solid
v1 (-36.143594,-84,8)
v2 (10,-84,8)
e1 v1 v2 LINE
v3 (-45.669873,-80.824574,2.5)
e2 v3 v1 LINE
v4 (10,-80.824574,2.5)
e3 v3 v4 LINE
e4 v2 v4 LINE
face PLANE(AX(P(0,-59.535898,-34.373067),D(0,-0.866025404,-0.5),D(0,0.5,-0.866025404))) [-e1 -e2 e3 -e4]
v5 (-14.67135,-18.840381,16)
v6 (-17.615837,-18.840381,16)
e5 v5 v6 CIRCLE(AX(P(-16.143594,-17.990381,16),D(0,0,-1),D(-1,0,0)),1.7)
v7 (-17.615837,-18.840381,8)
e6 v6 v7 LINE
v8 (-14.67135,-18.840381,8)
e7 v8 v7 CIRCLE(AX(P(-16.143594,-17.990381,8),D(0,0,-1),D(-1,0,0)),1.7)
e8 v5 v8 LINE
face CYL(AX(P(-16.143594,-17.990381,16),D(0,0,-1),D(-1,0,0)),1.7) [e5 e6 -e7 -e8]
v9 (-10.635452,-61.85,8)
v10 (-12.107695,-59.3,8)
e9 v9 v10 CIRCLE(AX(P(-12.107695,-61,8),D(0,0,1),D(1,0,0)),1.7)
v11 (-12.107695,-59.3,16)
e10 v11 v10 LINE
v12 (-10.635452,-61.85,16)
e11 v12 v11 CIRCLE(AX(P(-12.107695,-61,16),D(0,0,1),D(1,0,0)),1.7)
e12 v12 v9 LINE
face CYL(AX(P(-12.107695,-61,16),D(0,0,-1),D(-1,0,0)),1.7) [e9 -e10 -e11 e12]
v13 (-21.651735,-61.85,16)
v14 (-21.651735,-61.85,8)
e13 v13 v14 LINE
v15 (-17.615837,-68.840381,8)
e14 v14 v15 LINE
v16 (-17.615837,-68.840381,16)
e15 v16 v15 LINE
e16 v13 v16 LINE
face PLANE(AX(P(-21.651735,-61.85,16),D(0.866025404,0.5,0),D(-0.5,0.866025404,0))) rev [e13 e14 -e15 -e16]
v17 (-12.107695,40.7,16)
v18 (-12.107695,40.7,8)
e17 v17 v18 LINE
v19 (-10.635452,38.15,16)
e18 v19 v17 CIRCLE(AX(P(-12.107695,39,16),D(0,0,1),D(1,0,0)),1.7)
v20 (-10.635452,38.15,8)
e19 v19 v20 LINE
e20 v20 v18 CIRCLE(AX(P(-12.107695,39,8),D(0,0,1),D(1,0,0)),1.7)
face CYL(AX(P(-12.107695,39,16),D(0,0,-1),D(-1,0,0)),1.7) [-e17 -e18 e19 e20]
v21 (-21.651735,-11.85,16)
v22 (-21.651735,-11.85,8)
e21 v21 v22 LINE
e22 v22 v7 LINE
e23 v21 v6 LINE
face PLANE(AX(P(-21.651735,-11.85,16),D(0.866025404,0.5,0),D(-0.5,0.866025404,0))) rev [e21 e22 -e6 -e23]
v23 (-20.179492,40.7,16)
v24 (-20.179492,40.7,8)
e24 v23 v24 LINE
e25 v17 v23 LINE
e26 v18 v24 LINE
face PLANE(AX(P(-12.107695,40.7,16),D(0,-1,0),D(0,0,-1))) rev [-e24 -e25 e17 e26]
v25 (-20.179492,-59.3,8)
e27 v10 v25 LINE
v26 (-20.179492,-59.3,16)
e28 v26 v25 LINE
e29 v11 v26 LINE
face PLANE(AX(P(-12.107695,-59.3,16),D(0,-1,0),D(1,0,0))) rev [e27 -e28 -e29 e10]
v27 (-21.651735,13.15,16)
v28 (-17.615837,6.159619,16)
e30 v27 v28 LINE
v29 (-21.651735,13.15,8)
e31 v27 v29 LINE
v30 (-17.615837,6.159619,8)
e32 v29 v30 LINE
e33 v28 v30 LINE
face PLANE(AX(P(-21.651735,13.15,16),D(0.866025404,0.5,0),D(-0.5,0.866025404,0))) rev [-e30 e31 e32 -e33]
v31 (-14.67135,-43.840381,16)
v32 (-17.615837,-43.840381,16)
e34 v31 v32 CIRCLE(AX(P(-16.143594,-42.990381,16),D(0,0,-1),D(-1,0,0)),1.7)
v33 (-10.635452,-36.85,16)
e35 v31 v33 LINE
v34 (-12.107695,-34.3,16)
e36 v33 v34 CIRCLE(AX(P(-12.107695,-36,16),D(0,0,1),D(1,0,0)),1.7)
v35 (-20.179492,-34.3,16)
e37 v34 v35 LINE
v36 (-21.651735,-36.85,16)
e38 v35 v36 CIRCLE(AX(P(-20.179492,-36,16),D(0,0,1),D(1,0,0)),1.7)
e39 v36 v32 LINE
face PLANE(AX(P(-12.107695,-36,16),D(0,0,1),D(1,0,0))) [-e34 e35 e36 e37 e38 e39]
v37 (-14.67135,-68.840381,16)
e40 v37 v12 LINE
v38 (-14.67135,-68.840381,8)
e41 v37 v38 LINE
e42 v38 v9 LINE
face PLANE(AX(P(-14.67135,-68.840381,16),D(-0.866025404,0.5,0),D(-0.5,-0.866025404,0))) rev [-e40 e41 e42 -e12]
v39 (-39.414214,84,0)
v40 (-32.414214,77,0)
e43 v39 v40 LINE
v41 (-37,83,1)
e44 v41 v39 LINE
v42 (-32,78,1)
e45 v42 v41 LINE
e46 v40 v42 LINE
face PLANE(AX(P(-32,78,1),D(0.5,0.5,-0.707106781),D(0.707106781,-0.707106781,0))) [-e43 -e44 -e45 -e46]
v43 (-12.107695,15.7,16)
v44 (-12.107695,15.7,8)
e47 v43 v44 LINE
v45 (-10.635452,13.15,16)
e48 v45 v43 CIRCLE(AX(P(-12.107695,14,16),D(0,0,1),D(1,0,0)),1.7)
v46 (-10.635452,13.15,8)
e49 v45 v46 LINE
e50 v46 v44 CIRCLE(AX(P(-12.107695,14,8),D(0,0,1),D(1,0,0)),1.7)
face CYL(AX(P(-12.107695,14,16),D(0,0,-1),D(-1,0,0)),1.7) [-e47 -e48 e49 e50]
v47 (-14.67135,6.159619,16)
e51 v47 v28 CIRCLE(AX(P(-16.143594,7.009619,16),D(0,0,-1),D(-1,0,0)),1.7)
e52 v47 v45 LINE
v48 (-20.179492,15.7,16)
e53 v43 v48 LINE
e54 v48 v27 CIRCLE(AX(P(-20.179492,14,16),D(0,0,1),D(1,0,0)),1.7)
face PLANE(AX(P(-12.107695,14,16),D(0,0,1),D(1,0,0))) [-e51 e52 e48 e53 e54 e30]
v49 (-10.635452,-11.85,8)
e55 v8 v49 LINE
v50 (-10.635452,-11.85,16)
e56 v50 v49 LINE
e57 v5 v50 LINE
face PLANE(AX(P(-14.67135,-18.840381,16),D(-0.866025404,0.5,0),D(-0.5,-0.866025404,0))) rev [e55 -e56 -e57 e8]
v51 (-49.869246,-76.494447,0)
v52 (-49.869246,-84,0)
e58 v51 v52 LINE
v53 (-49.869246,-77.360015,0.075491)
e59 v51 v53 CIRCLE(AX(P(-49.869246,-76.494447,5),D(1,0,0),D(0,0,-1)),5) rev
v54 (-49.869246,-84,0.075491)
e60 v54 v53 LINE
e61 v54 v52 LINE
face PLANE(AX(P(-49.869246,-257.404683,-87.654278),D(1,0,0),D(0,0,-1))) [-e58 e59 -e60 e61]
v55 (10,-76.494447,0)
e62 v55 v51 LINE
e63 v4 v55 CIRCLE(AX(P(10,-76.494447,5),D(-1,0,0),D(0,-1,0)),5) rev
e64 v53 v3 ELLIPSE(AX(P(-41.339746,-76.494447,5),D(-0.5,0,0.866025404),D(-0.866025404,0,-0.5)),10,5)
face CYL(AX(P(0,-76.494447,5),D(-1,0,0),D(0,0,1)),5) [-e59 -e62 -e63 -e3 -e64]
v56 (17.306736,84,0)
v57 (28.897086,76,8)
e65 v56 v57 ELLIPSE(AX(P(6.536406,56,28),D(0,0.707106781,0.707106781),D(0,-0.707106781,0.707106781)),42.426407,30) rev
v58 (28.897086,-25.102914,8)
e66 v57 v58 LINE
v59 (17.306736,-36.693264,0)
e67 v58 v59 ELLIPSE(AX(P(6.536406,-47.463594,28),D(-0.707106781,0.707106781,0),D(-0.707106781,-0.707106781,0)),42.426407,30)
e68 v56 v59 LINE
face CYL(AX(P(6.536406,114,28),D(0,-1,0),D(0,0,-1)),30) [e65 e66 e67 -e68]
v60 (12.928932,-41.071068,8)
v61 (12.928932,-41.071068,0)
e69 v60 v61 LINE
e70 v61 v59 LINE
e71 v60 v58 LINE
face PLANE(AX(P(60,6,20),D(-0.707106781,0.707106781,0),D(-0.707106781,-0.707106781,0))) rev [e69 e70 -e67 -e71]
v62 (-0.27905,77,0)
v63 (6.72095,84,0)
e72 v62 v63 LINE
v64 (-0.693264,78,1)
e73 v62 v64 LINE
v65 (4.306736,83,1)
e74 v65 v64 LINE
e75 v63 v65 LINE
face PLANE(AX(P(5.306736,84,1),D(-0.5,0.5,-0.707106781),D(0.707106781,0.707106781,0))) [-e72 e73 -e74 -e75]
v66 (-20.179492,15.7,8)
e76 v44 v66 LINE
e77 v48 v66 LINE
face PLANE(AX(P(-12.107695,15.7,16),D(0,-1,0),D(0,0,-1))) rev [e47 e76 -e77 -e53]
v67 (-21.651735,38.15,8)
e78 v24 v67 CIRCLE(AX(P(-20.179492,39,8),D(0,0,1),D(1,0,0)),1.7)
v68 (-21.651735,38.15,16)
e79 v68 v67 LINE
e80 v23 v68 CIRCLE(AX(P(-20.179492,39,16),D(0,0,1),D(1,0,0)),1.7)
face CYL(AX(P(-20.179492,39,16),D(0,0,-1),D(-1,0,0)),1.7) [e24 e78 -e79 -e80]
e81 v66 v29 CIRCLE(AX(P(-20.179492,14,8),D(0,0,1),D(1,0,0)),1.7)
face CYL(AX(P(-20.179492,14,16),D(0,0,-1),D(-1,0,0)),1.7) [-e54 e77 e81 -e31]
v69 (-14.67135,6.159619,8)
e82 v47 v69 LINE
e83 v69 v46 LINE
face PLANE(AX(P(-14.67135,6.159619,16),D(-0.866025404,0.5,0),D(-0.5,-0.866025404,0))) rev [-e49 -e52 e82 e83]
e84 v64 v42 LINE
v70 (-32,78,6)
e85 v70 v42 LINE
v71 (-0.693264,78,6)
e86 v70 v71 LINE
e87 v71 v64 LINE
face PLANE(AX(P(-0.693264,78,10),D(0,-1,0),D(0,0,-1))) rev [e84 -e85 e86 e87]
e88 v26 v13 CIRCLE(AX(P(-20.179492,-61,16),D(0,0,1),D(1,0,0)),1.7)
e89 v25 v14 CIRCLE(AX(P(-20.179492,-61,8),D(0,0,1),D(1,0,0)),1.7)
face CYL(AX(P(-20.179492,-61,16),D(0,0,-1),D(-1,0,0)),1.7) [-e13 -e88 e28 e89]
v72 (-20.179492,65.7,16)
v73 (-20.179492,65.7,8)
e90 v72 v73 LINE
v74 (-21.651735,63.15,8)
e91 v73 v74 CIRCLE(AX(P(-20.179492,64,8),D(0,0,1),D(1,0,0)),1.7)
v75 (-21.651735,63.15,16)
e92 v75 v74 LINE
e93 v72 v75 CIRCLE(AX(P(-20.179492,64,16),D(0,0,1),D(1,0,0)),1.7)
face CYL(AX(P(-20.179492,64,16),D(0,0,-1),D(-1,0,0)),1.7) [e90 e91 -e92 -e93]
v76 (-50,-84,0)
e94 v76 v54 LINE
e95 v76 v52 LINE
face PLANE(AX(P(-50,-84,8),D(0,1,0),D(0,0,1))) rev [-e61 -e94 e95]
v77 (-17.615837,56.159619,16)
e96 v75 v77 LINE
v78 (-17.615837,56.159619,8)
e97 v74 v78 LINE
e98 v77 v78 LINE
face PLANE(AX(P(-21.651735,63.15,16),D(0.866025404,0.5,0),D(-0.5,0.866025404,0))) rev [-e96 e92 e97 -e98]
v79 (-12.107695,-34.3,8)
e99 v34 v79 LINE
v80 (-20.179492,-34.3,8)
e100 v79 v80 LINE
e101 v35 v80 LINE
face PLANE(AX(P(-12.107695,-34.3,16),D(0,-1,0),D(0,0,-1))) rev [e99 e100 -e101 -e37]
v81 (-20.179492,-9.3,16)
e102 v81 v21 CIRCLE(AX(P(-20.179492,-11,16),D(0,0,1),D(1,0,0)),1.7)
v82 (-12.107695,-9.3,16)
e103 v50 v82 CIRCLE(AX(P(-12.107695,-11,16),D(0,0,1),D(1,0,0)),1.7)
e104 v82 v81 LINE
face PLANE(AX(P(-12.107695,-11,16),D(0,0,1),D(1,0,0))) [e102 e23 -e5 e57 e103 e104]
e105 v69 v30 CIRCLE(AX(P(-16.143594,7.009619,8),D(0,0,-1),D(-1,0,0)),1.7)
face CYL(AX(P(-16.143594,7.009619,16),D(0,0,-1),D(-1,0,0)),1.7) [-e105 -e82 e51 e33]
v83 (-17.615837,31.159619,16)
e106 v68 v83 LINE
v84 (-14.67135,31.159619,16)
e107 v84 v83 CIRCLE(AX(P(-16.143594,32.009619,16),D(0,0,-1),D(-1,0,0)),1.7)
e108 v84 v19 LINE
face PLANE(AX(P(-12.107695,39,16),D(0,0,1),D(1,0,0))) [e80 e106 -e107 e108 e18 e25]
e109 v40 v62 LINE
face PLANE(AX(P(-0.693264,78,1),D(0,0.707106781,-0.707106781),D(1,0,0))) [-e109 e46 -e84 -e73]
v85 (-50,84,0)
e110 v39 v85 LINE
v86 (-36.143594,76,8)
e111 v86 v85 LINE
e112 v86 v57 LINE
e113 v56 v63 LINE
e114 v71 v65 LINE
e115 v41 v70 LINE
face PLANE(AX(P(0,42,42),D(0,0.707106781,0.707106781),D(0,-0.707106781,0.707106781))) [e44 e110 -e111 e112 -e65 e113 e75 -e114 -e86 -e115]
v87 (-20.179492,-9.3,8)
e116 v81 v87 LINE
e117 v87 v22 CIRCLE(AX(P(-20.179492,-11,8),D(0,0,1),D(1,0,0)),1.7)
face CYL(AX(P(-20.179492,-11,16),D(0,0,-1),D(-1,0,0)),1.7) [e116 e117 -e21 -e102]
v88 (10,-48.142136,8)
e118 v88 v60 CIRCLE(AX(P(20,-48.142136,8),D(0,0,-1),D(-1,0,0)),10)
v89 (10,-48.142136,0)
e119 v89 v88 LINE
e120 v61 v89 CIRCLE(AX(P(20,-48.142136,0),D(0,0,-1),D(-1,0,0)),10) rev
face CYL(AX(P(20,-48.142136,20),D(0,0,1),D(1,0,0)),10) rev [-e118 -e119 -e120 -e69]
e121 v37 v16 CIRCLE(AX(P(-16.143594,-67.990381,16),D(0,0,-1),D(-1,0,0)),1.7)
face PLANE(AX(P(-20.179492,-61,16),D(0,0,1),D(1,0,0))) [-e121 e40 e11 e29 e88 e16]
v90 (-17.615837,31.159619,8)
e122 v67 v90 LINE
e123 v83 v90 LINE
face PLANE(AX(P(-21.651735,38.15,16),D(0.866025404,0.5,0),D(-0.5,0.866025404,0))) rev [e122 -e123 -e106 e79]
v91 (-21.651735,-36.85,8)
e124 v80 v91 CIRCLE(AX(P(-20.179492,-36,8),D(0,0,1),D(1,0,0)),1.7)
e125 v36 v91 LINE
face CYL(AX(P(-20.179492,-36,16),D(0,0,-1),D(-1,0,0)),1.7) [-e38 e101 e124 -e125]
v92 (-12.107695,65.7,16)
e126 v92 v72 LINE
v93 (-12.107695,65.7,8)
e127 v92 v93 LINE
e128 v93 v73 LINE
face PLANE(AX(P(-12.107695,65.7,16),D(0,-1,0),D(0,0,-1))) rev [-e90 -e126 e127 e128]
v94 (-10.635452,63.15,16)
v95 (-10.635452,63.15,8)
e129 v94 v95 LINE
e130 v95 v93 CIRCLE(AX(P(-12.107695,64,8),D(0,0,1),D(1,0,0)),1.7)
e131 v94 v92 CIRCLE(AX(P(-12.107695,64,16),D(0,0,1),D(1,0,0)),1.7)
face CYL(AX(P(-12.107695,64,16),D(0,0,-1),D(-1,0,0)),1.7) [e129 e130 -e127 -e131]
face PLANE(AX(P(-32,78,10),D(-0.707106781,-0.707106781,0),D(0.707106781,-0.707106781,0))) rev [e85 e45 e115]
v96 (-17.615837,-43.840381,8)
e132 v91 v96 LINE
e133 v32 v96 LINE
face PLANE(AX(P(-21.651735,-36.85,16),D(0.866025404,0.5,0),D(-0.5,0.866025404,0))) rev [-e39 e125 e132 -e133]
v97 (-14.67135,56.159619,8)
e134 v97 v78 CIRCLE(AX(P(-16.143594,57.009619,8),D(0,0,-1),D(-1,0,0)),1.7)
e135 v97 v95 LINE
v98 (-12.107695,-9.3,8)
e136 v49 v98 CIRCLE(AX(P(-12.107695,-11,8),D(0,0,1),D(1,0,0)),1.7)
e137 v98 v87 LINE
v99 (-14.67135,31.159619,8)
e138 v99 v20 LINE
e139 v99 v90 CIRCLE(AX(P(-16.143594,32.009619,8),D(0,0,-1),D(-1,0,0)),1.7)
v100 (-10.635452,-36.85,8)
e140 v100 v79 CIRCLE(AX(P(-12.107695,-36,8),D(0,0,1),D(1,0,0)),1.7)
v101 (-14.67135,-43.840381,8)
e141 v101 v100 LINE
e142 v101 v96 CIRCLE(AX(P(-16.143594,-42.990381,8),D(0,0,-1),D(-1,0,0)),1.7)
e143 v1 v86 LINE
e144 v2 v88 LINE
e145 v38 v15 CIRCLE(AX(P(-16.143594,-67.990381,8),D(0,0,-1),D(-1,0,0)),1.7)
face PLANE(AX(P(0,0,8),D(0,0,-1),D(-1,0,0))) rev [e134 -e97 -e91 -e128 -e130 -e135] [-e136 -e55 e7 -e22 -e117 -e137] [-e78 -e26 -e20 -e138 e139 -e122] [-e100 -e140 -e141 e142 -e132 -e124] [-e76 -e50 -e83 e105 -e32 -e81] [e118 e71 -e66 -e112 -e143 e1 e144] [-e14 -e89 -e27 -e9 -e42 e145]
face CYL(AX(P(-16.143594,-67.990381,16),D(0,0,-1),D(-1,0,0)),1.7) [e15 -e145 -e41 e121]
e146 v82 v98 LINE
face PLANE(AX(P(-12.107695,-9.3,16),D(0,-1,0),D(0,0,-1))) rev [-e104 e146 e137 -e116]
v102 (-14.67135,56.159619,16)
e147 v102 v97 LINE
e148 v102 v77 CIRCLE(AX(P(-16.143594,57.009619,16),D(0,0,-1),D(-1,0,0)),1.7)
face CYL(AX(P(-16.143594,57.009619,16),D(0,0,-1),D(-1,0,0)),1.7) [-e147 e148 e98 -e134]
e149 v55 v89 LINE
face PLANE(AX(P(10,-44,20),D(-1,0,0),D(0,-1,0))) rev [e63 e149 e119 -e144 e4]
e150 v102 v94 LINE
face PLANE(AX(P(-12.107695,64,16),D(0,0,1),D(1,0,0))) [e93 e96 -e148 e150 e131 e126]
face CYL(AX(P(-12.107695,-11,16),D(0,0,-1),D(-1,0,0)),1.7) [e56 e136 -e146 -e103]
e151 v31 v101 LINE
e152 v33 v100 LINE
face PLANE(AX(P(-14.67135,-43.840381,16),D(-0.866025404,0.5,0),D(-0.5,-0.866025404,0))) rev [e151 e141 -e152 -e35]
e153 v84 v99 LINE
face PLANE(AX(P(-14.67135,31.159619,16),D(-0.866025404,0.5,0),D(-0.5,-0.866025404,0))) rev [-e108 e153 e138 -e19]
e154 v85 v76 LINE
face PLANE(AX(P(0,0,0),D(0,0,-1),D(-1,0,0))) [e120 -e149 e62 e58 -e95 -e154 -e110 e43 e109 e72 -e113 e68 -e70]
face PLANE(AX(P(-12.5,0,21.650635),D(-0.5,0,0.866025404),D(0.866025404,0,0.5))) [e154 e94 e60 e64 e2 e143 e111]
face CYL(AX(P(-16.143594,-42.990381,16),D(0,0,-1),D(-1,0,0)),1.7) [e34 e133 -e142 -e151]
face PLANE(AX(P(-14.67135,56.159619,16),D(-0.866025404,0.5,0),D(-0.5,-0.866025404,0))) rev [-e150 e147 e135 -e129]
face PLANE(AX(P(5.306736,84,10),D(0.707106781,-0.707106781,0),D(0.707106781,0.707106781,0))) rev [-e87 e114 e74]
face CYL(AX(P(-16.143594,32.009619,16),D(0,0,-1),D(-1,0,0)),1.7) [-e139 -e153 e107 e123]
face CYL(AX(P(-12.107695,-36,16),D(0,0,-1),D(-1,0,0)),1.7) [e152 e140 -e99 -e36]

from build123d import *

# Parameters (mm, degrees)
SKETCH_1_W          = 100
SKETCH_1_H          = 168
EXTRUDE_1_DEPTH     = 8
SKETCH_4_W          = 219.714234424
SKETCH_4_H          = 60.92406831
CUT_EXTRUDE_2_DEPTH = 8
SKETCH_5_W          = 131.187185814
SKETCH_5_H          = 64.749040209
CUT_EXTRUDE_3_DEPTH = 28
CUT_EXTRUDE_4_DEPTH = 198
SKETCH_7_W          = 88.901088493
SKETCH_7_H          = 24.075683618
CUT_EXTRUDE_5_DEPTH = 198
FILLET_2_R          = 5
CUT_EXTRUDE_6_DEPTH = 20
FILLET_3_R          = 10
EXTRUDE_2_DEPTH     = 8
CUT_EXTRUDE_7_DEPTH = 10
CHAMFER_1_SIZE      = 1


with BuildPart() as part:
    # 草图1 → 凸台-拉伸1 (new body)
    with BuildSketch(Plane.XY):
        Rectangle(SKETCH_1_W, SKETCH_1_H)
    extrude(amount=EXTRUDE_1_DEPTH)

    # 草图4 → 切除-拉伸2 (cut)
    with BuildSketch(Plane(origin=(-12.5, 0, 21.650635095), x_dir=(0, -1, 0), z_dir=(-0.499999999999998, 0, 0.8660254037844398))):
        with Locations((1.453456898, -25.633998951)):
            Rectangle(SKETCH_4_W, SKETCH_4_H)
    extrude(amount=CUT_EXTRUDE_2_DEPTH, mode=Mode.SUBTRACT)

    # 草图5 → 切除-拉伸3 (cut)
    with BuildSketch(Plane(origin=(0, 42, 42), x_dir=(-1, 0, 0), z_dir=(0, 0.7071067811865464, 0.7071067811865488))):
        with Locations((-5.06731619, -49.688146971)):
            Rectangle(SKETCH_5_W, SKETCH_5_H)
    extrude(amount=CUT_EXTRUDE_3_DEPTH, mode=Mode.SUBTRACT)

    # 草图6 → 切除-拉伸4 (cut)
    with BuildSketch(Plane.XZ.offset(84)):
        with BuildLine():
            Line((17.306736075, 0), (50, 0))
            Line((50, 0), (50, 8))
            Line((50, 8), (28.897086236, 8))
            ThreePointArc((28.897086236, 8), (23.578001039, 3.310243942), (17.306736075, 0))
        make_face()
    extrude(amount=-CUT_EXTRUDE_4_DEPTH, mode=Mode.SUBTRACT)

    # 草图7 → 切除-拉伸5 (cut)
    with BuildSketch(Plane(origin=(0, -59.535898385, -34.373066959), x_dir=(1, 0, 0), z_dir=(0, -0.866025403784438, -0.500000000000001))):
        with Locations((-5.418701979, 40.753668269)):
            Rectangle(SKETCH_7_W, SKETCH_7_H)
    extrude(amount=CUT_EXTRUDE_5_DEPTH, mode=Mode.SUBTRACT)

    # 圆角2
    # the kernel refuses this fillet: 5 mm, written as the material it takes off along each edge
    with BuildSketch(Plane(origin=(24.52361444, -79.381197846, 0), x_dir=(0, 1, 0), z_dir=(-1, 0, 0))) as fillet_2_piece_1:
        with BuildLine():
            CenterArc((FILLET_2_R * 0.57735026919, -FILLET_2_R), FILLET_2_R, 90, 60)
            Line((-FILLET_2_R * 0.288675134595, -FILLET_2_R * 0.5), (0, 0))
            Line((0, 0), (FILLET_2_R * 0.57735026919, 0))
        make_face()
    extrude(amount=74.392860666, mode=Mode.SUBTRACT)

    # 草图8 → 切除-拉伸6 (cut)
    with BuildSketch(Plane(origin=(0, 0, 0), x_dir=(-1, 0, 0), z_dir=(0, 0, -1))):
        Polygon((-60, 6), (-10, -44), (-10, -84), (0, -94), (-20, -94), (-60, -94), align=None)
    extrude(amount=-CUT_EXTRUDE_6_DEPTH, mode=Mode.SUBTRACT)

    # 圆角3
    fillet_3_edges = [part.edges().sort_by_distance(p)[0] for p in [
        (10, -44, 4),
    ]]
    fillet(fillet_3_edges, radius=FILLET_3_R)

    # 草图9 → 凸台-拉伸2 (add)
    with BuildSketch(Plane.XY.offset(8)):
        with BuildLine():
            ThreePointArc((-17.615836726, 56.159618943), (-16.143593539, 55.309618943), (-14.671350353, 56.159618943))
            Line((-14.671350353, 56.159618943), (-10.635451968, 63.15))
            ThreePointArc((-10.635451968, 63.15), (-10.635451968, 64.85), (-12.107695155, 65.7))
            Line((-12.107695155, 65.7), (-20.179491924, 65.7))
            ThreePointArc((-20.179491924, 65.7), (-21.651735111, 64.85), (-21.651735111, 63.15))
            Line((-21.651735111, 63.15), (-17.615836726, 56.159618943))
        make_face()
        with BuildLine():
            ThreePointArc((-17.615836726, 31.159618943), (-16.143593539, 30.309618943), (-14.671350353, 31.159618943))
            Line((-14.671350353, 31.159618943), (-10.635451968, 38.15))
            ThreePointArc((-10.635451968, 38.15), (-10.635451968, 39.85), (-12.107695155, 40.7))
            Line((-12.107695155, 40.7), (-20.179491924, 40.7))
            ThreePointArc((-20.179491924, 40.7), (-21.651735111, 39.85), (-21.651735111, 38.15))
            Line((-21.651735111, 38.15), (-17.615836726, 31.159618943))
        make_face()
        with BuildLine():
            ThreePointArc((-17.615836726, 6.159618943), (-16.143593539, 5.309618943), (-14.671350353, 6.159618943))
            Line((-14.671350353, 6.159618943), (-10.635451968, 13.15))
            ThreePointArc((-10.635451968, 13.15), (-10.635451968, 14.85), (-12.107695155, 15.7))
            Line((-12.107695155, 15.7), (-20.179491924, 15.7))
            ThreePointArc((-20.179491924, 15.7), (-21.651735111, 14.85), (-21.651735111, 13.15))
            Line((-21.651735111, 13.15), (-17.615836726, 6.159618943))
        make_face()
        with BuildLine():
            ThreePointArc((-17.615836726, -18.840381057), (-16.143593539, -19.690381057), (-14.671350353, -18.840381057))
            Line((-14.671350353, -18.840381057), (-10.635451968, -11.85))
            ThreePointArc((-10.635451968, -11.85), (-10.635451968, -10.15), (-12.107695155, -9.3))
            Line((-12.107695155, -9.3), (-20.179491924, -9.3))
            ThreePointArc((-20.179491924, -9.3), (-21.651735111, -10.15), (-21.651735111, -11.85))
            Line((-21.651735111, -11.85), (-17.615836726, -18.840381057))
        make_face()
        with BuildLine():
            ThreePointArc((-17.615836726, -43.840381057), (-16.143593539, -44.690381057), (-14.671350353, -43.840381057))
            Line((-14.671350353, -43.840381057), (-10.635451968, -36.85))
            ThreePointArc((-10.635451968, -36.85), (-10.635451968, -35.15), (-12.107695155, -34.3))
            Line((-12.107695155, -34.3), (-20.179491924, -34.3))
            ThreePointArc((-20.179491924, -34.3), (-21.651735111, -35.15), (-21.651735111, -36.85))
            Line((-21.651735111, -36.85), (-17.615836726, -43.840381057))
        make_face()
        with BuildLine():
            ThreePointArc((-10.635451968, -61.85), (-10.635451968, -60.15), (-12.107695155, -59.3))
            Line((-12.107695155, -59.3), (-20.179491924, -59.3))
            ThreePointArc((-20.179491924, -59.3), (-21.651735111, -60.15), (-21.651735111, -61.85))
            Line((-21.651735111, -61.85), (-17.615836726, -68.840381057))
            ThreePointArc((-17.615836726, -68.840381057), (-16.143593539, -69.690381057), (-14.671350353, -68.840381057))
            Line((-14.671350353, -68.840381057), (-10.635451968, -61.85))
        make_face()
    extrude(amount=EXTRUDE_2_DEPTH)

    # 草图10 → 切除-拉伸7 (cut)
    with BuildSketch(Plane(origin=(0, 0, 0), x_dir=(-1, 0, 0), z_dir=(0, 0, -1))):
        Polygon((-5.306736075, 84), (0.693263925, 78), (32, 78), (38, 84), align=None)
    extrude(amount=-CUT_EXTRUDE_7_DEPTH, mode=Mode.SUBTRACT)

    # 倒角1
    chamfer_1_edges = [part.edges().sort_by_distance(p)[0] for p in [
        (2.306736075, 81, 0),
        (-16.346631963, 78, 0),
        (-35, 81, 0),
    ]]
    chamfer(chamfer_1_edges, length=CHAMFER_1_SIZE)


solid = part.part
